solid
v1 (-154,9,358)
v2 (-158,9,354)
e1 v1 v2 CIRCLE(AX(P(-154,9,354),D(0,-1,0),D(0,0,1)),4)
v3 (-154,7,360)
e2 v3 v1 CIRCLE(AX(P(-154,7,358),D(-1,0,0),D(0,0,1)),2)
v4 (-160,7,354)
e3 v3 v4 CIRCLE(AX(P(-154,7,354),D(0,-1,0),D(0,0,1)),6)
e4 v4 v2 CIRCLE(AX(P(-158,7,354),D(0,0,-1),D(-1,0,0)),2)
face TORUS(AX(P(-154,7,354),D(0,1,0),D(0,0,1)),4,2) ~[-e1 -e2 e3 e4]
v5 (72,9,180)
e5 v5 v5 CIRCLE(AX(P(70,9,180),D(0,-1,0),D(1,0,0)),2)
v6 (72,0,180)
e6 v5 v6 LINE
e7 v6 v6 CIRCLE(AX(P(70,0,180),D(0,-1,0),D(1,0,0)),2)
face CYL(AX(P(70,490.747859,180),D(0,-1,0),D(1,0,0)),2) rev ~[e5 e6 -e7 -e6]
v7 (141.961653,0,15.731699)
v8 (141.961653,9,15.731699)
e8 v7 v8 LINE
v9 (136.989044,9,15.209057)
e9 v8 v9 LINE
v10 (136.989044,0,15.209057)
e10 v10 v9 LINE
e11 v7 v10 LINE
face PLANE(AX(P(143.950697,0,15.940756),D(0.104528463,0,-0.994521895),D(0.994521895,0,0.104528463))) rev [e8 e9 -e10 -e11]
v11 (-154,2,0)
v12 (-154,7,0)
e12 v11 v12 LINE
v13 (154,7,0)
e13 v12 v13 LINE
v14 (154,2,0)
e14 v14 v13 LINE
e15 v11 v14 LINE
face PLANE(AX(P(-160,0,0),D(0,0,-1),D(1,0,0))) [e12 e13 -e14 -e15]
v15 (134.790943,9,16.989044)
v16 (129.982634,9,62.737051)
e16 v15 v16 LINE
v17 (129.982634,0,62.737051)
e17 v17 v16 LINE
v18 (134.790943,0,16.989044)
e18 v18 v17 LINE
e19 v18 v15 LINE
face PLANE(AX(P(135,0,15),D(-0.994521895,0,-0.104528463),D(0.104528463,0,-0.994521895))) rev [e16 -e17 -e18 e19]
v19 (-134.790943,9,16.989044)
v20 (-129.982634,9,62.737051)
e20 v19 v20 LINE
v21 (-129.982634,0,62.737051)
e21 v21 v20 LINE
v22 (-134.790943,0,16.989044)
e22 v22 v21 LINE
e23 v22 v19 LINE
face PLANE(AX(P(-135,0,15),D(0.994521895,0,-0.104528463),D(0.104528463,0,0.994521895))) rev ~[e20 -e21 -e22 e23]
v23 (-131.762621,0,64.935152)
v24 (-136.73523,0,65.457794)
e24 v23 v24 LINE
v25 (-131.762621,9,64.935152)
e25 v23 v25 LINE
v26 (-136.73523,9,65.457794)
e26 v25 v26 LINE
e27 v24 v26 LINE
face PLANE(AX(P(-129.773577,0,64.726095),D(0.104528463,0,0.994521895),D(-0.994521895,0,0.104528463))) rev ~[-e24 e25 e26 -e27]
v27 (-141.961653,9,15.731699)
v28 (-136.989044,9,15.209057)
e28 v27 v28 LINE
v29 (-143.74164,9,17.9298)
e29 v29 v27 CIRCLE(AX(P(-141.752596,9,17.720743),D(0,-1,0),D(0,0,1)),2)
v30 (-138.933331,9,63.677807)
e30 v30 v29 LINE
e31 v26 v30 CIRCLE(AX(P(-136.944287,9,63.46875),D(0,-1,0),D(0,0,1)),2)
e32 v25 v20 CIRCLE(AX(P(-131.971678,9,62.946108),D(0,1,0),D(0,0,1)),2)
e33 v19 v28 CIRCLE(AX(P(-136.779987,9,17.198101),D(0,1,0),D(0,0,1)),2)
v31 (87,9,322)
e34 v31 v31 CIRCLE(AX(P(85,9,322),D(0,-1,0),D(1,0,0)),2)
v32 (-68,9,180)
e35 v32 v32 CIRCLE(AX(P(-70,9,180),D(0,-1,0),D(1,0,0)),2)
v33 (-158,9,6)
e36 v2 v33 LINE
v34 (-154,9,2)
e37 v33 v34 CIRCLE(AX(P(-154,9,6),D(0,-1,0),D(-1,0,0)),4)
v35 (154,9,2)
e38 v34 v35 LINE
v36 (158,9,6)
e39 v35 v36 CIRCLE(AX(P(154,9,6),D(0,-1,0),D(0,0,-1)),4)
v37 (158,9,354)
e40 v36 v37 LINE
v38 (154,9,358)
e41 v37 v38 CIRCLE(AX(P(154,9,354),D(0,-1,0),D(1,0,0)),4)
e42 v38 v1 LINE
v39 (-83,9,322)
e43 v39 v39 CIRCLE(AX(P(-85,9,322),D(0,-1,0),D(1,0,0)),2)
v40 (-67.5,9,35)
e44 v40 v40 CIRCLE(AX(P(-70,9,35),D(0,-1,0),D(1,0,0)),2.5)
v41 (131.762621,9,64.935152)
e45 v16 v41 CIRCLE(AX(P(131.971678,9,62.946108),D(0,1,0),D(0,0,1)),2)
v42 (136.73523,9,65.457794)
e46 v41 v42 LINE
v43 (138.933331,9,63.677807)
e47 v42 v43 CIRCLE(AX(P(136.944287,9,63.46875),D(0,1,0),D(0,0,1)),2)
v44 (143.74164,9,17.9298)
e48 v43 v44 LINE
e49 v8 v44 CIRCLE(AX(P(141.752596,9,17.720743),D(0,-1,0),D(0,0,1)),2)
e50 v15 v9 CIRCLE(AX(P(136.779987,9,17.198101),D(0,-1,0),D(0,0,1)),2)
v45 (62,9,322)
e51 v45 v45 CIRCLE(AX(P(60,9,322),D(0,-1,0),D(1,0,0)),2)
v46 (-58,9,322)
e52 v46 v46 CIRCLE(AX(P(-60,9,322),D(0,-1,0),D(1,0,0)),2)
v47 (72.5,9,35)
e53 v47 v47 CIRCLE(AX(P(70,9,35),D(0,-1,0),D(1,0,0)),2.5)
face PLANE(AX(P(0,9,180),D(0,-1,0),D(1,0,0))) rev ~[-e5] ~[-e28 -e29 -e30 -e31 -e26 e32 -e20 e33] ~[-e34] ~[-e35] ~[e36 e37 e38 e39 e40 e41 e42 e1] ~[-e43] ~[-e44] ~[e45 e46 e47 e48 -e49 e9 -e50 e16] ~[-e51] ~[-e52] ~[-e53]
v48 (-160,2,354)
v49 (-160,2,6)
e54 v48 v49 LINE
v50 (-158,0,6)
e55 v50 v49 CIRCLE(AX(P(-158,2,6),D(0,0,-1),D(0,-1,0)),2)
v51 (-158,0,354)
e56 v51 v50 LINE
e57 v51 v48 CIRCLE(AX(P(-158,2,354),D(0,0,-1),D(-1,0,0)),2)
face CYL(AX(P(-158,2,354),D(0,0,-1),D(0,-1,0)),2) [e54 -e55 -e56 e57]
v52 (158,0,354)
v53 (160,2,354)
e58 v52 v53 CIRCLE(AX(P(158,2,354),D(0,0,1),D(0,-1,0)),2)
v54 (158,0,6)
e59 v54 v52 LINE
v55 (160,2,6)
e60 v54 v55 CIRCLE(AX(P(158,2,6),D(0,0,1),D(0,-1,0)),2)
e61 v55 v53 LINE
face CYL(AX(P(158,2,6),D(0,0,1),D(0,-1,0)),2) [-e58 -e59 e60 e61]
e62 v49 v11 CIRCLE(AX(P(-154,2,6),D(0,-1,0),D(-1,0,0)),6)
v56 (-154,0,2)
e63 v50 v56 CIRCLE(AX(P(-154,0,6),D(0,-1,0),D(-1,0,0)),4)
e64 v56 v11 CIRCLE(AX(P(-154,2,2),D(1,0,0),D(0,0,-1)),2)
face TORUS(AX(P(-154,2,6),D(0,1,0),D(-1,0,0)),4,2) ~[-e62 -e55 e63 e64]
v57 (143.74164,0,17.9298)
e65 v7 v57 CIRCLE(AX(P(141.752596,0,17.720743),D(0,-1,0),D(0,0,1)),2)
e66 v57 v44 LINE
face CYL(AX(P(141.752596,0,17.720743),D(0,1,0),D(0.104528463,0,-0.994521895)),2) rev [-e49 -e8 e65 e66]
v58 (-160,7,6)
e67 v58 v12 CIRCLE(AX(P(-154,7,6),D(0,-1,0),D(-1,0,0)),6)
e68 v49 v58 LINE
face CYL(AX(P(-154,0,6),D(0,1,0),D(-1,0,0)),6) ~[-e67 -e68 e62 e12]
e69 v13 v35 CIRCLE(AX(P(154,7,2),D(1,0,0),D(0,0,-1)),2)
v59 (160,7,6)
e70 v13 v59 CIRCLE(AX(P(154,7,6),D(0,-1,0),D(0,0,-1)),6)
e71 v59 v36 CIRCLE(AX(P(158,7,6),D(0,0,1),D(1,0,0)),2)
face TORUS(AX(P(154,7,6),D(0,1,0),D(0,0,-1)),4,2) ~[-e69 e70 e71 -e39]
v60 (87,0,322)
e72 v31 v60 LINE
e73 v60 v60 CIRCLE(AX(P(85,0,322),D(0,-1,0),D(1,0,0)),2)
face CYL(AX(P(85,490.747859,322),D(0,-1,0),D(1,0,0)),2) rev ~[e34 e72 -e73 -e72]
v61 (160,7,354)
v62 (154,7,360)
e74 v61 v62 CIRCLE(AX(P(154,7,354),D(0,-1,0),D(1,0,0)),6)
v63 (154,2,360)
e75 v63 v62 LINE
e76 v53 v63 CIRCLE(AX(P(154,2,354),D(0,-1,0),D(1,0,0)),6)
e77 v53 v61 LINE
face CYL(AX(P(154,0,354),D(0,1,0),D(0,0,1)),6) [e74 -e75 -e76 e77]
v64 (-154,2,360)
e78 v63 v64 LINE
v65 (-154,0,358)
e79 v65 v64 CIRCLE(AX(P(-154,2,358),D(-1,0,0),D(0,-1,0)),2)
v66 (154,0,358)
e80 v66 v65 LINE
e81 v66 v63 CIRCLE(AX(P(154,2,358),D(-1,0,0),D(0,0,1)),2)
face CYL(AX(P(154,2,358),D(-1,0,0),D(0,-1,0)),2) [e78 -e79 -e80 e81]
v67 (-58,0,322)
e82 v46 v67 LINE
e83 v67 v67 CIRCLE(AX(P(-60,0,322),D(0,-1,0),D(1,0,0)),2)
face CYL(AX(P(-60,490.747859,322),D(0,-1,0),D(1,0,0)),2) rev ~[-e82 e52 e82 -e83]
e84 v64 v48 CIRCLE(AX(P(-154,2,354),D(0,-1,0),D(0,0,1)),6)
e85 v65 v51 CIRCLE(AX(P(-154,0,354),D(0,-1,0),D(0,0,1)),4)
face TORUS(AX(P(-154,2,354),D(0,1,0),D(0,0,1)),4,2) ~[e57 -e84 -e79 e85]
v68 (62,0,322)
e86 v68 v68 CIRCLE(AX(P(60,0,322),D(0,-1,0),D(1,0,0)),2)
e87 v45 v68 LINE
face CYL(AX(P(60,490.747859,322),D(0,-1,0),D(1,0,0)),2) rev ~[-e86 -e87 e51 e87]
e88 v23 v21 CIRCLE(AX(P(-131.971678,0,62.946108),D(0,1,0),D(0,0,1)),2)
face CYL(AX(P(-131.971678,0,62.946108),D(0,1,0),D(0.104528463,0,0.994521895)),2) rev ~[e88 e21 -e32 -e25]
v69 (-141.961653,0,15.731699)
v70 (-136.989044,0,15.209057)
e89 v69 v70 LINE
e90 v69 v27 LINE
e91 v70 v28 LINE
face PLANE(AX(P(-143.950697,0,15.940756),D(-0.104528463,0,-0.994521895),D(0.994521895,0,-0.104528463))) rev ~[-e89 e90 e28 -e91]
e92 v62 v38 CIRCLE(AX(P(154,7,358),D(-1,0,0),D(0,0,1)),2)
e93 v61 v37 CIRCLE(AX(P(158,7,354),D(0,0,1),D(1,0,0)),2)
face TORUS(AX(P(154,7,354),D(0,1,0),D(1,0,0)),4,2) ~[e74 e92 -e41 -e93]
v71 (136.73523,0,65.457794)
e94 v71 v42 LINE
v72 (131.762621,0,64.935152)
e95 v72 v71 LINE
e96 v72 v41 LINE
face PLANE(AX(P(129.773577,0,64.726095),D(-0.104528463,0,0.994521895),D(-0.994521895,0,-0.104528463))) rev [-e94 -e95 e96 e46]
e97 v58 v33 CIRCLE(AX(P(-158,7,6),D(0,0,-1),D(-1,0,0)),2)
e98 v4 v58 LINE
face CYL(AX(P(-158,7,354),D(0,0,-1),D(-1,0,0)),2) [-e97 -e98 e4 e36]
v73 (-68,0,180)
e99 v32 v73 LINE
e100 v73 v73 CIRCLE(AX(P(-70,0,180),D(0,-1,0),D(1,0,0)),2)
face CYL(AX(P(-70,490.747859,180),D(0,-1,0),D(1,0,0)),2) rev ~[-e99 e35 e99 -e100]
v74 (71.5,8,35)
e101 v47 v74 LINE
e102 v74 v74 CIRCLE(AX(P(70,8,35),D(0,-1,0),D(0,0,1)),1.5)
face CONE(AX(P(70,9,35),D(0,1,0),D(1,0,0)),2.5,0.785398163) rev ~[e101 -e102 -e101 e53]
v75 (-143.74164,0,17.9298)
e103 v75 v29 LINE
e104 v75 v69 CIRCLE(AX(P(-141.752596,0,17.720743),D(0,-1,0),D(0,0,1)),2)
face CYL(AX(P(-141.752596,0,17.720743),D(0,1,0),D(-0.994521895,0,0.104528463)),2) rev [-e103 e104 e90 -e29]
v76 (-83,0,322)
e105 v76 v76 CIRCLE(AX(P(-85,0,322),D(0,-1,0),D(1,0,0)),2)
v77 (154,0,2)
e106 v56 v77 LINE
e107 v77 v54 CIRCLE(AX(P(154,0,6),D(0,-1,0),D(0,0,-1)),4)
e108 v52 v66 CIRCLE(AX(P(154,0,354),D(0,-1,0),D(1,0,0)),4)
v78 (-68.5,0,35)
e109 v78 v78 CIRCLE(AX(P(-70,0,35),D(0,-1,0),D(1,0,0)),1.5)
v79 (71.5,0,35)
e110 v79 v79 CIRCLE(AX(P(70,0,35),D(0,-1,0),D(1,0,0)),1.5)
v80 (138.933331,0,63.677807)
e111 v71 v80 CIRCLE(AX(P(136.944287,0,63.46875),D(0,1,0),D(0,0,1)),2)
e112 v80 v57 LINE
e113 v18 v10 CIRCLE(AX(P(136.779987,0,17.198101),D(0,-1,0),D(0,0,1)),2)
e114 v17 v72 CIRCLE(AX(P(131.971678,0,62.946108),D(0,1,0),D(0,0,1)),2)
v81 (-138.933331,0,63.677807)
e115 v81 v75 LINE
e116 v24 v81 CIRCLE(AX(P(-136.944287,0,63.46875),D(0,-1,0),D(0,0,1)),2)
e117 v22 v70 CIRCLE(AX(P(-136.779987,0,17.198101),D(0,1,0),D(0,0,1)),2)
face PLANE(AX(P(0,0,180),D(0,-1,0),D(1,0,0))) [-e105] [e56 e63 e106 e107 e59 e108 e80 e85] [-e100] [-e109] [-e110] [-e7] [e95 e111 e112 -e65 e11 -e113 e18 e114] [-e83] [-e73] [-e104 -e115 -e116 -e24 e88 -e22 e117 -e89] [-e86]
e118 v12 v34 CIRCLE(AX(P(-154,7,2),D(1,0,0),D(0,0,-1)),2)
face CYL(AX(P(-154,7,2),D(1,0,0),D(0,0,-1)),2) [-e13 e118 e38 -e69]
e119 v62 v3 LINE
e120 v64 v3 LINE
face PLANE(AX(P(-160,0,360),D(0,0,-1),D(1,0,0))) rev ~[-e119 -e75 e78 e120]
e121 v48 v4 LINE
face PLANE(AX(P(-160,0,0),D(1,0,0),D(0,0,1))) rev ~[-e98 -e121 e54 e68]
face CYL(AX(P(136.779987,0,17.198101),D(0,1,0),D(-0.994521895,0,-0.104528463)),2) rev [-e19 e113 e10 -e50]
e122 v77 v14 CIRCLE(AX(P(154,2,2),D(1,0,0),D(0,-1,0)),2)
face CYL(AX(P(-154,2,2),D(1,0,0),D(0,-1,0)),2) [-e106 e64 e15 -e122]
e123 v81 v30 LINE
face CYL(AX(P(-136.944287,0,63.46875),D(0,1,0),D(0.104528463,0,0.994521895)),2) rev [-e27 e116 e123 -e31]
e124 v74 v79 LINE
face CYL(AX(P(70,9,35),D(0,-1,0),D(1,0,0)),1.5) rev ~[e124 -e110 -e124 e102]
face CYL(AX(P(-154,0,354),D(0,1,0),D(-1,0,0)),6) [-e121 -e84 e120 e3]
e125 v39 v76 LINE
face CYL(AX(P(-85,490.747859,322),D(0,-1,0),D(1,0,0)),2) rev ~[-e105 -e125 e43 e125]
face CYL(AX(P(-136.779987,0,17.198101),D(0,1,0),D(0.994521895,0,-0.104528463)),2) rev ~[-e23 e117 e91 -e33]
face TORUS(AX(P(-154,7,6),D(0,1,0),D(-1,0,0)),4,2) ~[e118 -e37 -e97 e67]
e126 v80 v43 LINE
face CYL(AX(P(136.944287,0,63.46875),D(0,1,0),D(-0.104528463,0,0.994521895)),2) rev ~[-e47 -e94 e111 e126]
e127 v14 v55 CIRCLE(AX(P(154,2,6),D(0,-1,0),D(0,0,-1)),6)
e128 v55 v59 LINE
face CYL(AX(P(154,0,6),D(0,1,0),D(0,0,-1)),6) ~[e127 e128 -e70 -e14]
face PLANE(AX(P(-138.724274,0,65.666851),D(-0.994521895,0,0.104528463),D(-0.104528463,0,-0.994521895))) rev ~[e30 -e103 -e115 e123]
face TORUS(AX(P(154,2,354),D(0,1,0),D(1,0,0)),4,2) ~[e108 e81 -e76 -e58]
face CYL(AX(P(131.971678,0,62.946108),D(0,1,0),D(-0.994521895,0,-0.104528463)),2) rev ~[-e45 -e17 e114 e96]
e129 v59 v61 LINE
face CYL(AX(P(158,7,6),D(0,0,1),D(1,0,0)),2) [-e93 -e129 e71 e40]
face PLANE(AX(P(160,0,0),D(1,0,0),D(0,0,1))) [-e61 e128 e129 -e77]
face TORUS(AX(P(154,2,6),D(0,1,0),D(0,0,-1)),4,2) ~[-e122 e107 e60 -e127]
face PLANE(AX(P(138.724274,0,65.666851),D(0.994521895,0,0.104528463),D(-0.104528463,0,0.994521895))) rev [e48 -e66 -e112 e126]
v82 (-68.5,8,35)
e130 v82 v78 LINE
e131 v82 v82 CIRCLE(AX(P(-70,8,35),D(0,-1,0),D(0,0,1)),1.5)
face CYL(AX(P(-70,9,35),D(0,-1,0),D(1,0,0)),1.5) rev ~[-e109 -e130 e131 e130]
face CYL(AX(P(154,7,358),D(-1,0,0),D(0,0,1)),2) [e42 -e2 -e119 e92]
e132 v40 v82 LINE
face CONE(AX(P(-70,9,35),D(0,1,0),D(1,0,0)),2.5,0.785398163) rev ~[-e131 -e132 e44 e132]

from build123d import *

# Parameters (mm, degrees)
F0_W           = 320
F0_H           = 360
F1_DEPTH       = 9
F3_DEPTH       = 9.001
F4_R           = 2
F5_R           = 6
F7_D           = 3
F7_CSINK_D     = 5
F7_CSINK_ANGLE = 90
F9_D           = 4
F10_R          = 2


# Not quite as in the source:
# - a pattern or mirror of a feature is missing from the dataset's text; its kind, count and spacing are read off the source's solid
# - a feature names something its author has since deleted; it is built from what else it names


with BuildPart() as f1:
    # F0 (on Front) → F1 (new body)
    with BuildSketch(Plane.XZ):
        with Locations((0, 180)):
            Rectangle(F0_W, F0_H)
    extrude(amount=-F1_DEPTH)

    # F2 (on Front) → F3 (cut, through all)
    with BuildSketch(Plane.XZ):
        Polygon((-129.7735768366, 64.7260947684), (-138.7242738949, 65.6668509378), (-143.9506970583, 15.9407561694), (-135, 15), align=None)
    f3 = extrude(amount=-F3_DEPTH, mode=Mode.SUBTRACT)

    # F3_copies: F3 across plane
    add(f3.mirror(Plane(origin=(0, 0, 0), x_dir=(0, 0, 1), z_dir=(1, 0, 0))), mode=Mode.SUBTRACT)

    # F4
    f4_edges = [f1.edges().sort_by_distance(p)[0] for p in [
        (-135, 4.5, 15),
        (-143.950697, 4.5, 15.940756),
        (-129.773577, 4.5, 64.726095),
        (-138.724274, 4.5, 65.666851),
    ]]
    fillet(f4_edges, radius=F4_R)

    # F5
    f5_edges = [f1.edges().sort_by_distance(p)[0] for p in [
        (160, 4.5, 0),
        (160, 4.5, 360),
        (-160, 4.5, 360),
        (-160, 4.5, 0),
    ]]
    fillet(f5_edges, radius=F5_R)

    # F7 (through all)
    with Locations(Plane(origin=(0, 9, 0), x_dir=(-1, 0, 0), z_dir=(0, 1, 0))):
        with Locations((-70, 35), (70, 35)):
            CounterSinkHole(F7_D / 2, F7_CSINK_D / 2, counter_sink_angle=F7_CSINK_ANGLE)

    # F9 (through all)
    with Locations(Plane(origin=(0, 9, 0), x_dir=(-1, 0, 0), z_dir=(0, 1, 0))):
        with Locations((-70, 180), (70, 180), (85, 322), (60, 322), (-60, 322), (-85, 322)):
            Hole(F9_D / 2)

    # F10
    f10_edges = [f1.edges().sort_by_distance(p)[0] for p in [
        (160, 9, 180),
        (160, 0, 180),
        (0, 0, 360),
        (158.242641, 0, 358.242641),
        (-158.242641, 0, 358.242641),
        (-160, 0, 180),
        (158.242641, 0, 1.757359),
        (-158.242641, 0, 1.757359),
        (0, 0, 0),
        (0, 9, 360),
        (158.242641, 9, 358.242641),
        (-158.242641, 9, 358.242641),
        (-160, 9, 180),
        (158.242641, 9, 1.757359),
        (-158.242641, 9, 1.757359),
        (0, 9, 0),
        (143.950697, 4.5, 15.940756),
        (138.724274, 4.5, 65.666851),
        (129.773577, 4.5, 64.726095),
        (135, 4.5, 15),
    ]]
    fillet(f10_edges, radius=F10_R)


solid = f1.part
